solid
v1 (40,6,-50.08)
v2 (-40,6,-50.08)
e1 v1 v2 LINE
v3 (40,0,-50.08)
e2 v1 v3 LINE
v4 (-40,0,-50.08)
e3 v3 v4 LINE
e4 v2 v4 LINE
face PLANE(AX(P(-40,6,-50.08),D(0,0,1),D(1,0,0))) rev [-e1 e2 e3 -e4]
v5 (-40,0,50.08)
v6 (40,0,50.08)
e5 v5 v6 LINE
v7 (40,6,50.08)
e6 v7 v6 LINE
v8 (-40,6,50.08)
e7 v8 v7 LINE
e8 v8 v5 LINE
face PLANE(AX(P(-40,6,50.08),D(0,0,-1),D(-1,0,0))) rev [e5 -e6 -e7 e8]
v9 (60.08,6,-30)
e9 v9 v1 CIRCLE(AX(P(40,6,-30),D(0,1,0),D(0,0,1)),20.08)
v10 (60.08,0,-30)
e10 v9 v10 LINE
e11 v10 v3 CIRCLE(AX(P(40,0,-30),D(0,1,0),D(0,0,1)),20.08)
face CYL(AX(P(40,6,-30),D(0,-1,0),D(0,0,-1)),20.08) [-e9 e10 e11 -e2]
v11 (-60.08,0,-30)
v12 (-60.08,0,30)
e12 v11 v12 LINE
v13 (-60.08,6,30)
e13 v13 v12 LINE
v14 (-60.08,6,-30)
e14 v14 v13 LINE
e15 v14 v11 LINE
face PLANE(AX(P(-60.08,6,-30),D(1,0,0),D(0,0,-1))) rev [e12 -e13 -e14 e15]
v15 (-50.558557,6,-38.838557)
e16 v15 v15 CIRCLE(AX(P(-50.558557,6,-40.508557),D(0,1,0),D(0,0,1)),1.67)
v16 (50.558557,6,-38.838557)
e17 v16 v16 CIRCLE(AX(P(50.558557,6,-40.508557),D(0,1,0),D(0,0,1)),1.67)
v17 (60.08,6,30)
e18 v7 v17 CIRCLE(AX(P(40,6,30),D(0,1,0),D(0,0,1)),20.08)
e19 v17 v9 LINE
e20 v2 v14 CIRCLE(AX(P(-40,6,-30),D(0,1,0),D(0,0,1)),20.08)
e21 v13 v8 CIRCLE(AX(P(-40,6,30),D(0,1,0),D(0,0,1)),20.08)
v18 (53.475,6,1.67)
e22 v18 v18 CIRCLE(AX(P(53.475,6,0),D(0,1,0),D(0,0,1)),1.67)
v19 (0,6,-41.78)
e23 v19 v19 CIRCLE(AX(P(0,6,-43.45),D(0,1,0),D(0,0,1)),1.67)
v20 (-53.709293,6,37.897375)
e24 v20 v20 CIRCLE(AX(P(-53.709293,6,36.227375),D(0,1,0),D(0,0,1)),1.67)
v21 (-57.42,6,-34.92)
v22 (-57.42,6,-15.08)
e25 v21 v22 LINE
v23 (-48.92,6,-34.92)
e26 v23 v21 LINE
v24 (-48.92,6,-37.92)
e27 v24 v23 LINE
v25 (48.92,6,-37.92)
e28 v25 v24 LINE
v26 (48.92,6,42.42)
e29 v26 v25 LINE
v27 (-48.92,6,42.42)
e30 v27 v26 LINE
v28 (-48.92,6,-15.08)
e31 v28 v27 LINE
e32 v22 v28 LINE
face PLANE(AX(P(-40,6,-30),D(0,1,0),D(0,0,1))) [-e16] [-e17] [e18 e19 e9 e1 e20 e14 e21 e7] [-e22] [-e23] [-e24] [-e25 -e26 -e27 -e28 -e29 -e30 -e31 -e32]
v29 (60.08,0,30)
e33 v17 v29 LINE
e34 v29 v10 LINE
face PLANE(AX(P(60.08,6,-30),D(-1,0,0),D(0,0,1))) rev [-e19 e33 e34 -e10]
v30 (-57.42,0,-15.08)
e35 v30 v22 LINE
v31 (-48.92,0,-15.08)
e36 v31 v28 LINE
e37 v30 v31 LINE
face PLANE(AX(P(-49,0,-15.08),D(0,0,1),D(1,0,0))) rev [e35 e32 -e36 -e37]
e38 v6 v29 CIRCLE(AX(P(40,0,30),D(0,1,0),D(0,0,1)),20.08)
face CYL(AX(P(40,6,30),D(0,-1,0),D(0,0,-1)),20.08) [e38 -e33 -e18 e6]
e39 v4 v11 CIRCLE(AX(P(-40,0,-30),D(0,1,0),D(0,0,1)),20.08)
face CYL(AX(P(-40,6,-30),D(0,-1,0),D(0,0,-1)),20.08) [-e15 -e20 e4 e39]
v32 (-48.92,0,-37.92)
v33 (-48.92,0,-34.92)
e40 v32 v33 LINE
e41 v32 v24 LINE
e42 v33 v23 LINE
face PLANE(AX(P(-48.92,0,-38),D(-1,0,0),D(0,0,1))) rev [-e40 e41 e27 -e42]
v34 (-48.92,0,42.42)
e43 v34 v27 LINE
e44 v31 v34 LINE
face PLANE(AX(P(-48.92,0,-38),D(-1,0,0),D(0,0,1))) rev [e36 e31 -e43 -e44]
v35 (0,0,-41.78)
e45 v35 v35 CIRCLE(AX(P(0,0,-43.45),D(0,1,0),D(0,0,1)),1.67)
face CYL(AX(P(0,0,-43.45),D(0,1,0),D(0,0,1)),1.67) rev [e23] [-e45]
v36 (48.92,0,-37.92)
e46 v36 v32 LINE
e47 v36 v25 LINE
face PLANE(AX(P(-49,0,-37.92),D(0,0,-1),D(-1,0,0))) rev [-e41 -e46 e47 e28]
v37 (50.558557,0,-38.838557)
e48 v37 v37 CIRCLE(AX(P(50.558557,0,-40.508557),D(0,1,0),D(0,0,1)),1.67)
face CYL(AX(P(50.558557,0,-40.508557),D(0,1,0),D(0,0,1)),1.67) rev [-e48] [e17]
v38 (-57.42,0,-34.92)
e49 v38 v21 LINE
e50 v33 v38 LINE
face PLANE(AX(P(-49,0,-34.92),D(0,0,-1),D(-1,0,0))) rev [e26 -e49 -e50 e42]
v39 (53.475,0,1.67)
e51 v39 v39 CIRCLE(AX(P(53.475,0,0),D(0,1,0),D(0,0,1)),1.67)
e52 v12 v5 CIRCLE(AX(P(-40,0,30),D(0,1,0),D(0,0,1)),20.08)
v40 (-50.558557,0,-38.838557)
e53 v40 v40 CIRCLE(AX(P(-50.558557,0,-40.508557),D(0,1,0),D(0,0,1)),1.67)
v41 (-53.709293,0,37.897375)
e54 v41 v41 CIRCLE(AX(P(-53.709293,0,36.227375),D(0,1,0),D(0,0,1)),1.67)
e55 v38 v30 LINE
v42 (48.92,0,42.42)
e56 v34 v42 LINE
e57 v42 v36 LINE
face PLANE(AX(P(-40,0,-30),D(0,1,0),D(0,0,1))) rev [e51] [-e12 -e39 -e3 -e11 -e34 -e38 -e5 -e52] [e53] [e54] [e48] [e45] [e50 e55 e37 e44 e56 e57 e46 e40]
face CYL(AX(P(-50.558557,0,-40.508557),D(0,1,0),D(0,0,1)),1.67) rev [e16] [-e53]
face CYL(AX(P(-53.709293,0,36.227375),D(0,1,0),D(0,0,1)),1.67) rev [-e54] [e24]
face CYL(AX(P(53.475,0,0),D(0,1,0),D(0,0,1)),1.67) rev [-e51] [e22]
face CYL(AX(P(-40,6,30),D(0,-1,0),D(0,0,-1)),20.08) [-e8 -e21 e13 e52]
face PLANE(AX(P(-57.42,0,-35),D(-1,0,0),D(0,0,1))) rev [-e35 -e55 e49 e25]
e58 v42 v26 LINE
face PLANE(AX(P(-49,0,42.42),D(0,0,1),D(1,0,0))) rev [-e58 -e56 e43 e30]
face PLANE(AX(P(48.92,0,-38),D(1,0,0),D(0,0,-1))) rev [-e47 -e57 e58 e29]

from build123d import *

# Parameters (mm, degrees)
BOSS_EXTRUDE1_DEPTH    = 6
SKETCH2_W              = 98
SKETCH2_H              = 80.5
CUT_EXTRUDE1_DEPTH     = 79.33262411
SKETCH5_R              = 1.75
CUT_EXTRUDE4_DEPTH     = 79.33262411
SKETCH6_W              = 8.5
SKETCH6_H              = 20
CUT_EXTRUDE5_DEPTH     = 79.33262411
MOVE_FACE1_OUTLINE_R   = 1.75
MOVE_FACE1_OUTLINE_R_2 = 1.67
MOVE_FACE1_DEPTH       = 6


# Read off the part's stored shape, not the designer's step: Move Face1
with BuildPart() as part:
    # Sketch1 → Boss-Extrude1 (new body)
    with BuildSketch(Plane(origin=(0, 0, 0), x_dir=(1, 0, 0), z_dir=(0, 1, 0))):
        with BuildLine():
            Line((-60, 30), (-60, -30))
            ThreePointArc((-60, -30), (-54.142135624, -44.142135624), (-40, -50))
            Line((-40, -50), (40, -50))
            ThreePointArc((40, -50), (54.142135624, -44.142135624), (60, -30))
            Line((60, -30), (60, 30))
            ThreePointArc((60, 30), (54.142135624, 44.142135624), (40, 50))
            Line((40, 50), (-40, 50))
            ThreePointArc((-40, 50), (-54.142135624, 44.142135624), (-60, 30))
        make_face()
    extrude(amount=BOSS_EXTRUDE1_DEPTH)

    # Sketch2 → Cut-Extrude1 (cut, through all)
    with BuildSketch(Plane(origin=(0, 6, 0), x_dir=(1, 0, 0), z_dir=(0, 1, 0))):
        with Locations((0, -2.25)):
            Rectangle(SKETCH2_W, SKETCH2_H)
    extrude(amount=-CUT_EXTRUDE1_DEPTH, mode=Mode.SUBTRACT)

    # Sketch5 → Cut-Extrude4 (cut, through all)
    with BuildSketch(Plane(origin=(0, 6, 0), x_dir=(1, 0, 0), z_dir=(0, 1, 0))):
        with Locations(Location((53.475, 0, 0), (0, 0, 270))):
            Circle(SKETCH5_R)
        with Locations(Location((-53.709292606, -36.227375296, 0), (0, 0, 270))):
            Circle(SKETCH5_R)
        with Locations(Location((0, 43.45, 0), (0, 0, 270))):
            Circle(SKETCH5_R)
        with Locations(Location((50.558556763, 40.508556763, 0), (0, 0, 270))):
            Circle(SKETCH5_R)
        with Locations(Location((-50.558556763, 40.508556763, 0), (0, 0, 90))):
            Circle(SKETCH5_R)
    extrude(amount=-CUT_EXTRUDE4_DEPTH, mode=Mode.SUBTRACT)

    # Sketch6 → Cut-Extrude5 (cut, through all)
    with BuildSketch(Plane(origin=(0, 6, 0), x_dir=(1, 0, 0), z_dir=(0, 1, 0))):
        with Locations((-53.25, 25)):
            Rectangle(SKETCH6_W, SKETCH6_H)
    extrude(amount=-CUT_EXTRUDE5_DEPTH, mode=Mode.SUBTRACT)

    # Move Face1 outline → Move Face1 (add)
    # profile 1 of 7: a face of its own
    with BuildSketch(Plane(origin=(0, 0, 0), x_dir=(1, 0, 0), z_dir=(0, 1, 0))):
        with BuildLine():
            ThreePointArc((-40, 50.08), (-54.198704166, 44.198704166), (-60.08, 30))
            Line((-60.08, 30), (-60.08, -30))
            ThreePointArc((-60.08, -30), (-54.198704166, -44.198704166), (-40, -50.08))
            Line((-40, -50.08), (40, -50.08))
            ThreePointArc((40, -50.08), (54.198704166, -44.198704166), (60.08, -30))
            Line((60.08, -30), (60.08, 30))
            ThreePointArc((60.08, 30), (54.198704166, 44.198704166), (40, 50.08))
            Line((40, 50.08), (-40, 50.08))
        make_face()
        with BuildLine():
            Line((-60, -30), (-60, 30))
            ThreePointArc((-60, 30), (-54.142135624, 44.142135624), (-40, 50))
            Line((-40, 50), (40, 50))
            ThreePointArc((40, 50), (54.142135624, 44.142135624), (60, 30))
            Line((60, 30), (60, -30))
            ThreePointArc((60, -30), (54.142135624, -44.142135624), (40, -50))
            Line((40, -50), (-40, -50))
            ThreePointArc((-40, -50), (-54.142135624, -44.142135624), (-60, -30))
        make_face(mode=Mode.SUBTRACT)
    # profile 2 of 7: a face of its own
    with BuildSketch(Plane(origin=(0, 0, 0), x_dir=(1, 0, 0), z_dir=(0, 1, 0))):
        Polygon((-57.5, 15), (-49, 15), (-49, -42.5), (49, -42.5), (49, 38), (-49, 38), (-49, 35), (-57.5, 35), align=None)
        Polygon((-48.92, -42.42), (-48.92, 15.08), (-57.42, 15.08), (-57.42, 34.92), (-48.92, 34.92), (-48.92, 37.92), (48.92, 37.92), (48.92, -42.42), align=None, mode=Mode.SUBTRACT)
    # profile 3 of 7: a face of its own
    with BuildSketch(Plane(origin=(0, 0, 0), x_dir=(1, 0, 0), z_dir=(0, 1, 0))):
        with Locations((53.475, 0)):
            Circle(MOVE_FACE1_OUTLINE_R)
        with Locations((53.475, 0)):
            Circle(MOVE_FACE1_OUTLINE_R_2, mode=Mode.SUBTRACT)
    # profile 4 of 7: a face of its own
    with BuildSketch(Plane(origin=(0, 0, 0), x_dir=(1, 0, 0), z_dir=(0, 1, 0))):
        with Locations((0, 43.45)):
            Circle(MOVE_FACE1_OUTLINE_R)
        with Locations((0, 43.45)):
            Circle(MOVE_FACE1_OUTLINE_R_2, mode=Mode.SUBTRACT)
    # profile 5 of 7: a face of its own
    with BuildSketch(Plane(origin=(0, 0, 0), x_dir=(1, 0, 0), z_dir=(0, 1, 0))):
        with Locations((50.558556763, 40.508556763)):
            Circle(MOVE_FACE1_OUTLINE_R)
        with Locations((50.558556763, 40.508556763)):
            Circle(MOVE_FACE1_OUTLINE_R_2, mode=Mode.SUBTRACT)
    # profile 6 of 7: a face of its own
    with BuildSketch(Plane(origin=(0, 0, 0), x_dir=(1, 0, 0), z_dir=(0, 1, 0))):
        with Locations((-50.558556763, 40.508556763)):
            Circle(MOVE_FACE1_OUTLINE_R)
        with Locations((-50.558556763, 40.508556763)):
            Circle(MOVE_FACE1_OUTLINE_R_2, mode=Mode.SUBTRACT)
    # profile 7 of 7: a face of its own
    with BuildSketch(Plane(origin=(0, 0, 0), x_dir=(1, 0, 0), z_dir=(0, 1, 0))):
        with Locations((-53.709292606, -36.227375296)):
            Circle(MOVE_FACE1_OUTLINE_R)
        with Locations((-53.709292606, -36.227375296)):
            Circle(MOVE_FACE1_OUTLINE_R_2, mode=Mode.SUBTRACT)
    extrude(amount=MOVE_FACE1_DEPTH)


solid = part.part
